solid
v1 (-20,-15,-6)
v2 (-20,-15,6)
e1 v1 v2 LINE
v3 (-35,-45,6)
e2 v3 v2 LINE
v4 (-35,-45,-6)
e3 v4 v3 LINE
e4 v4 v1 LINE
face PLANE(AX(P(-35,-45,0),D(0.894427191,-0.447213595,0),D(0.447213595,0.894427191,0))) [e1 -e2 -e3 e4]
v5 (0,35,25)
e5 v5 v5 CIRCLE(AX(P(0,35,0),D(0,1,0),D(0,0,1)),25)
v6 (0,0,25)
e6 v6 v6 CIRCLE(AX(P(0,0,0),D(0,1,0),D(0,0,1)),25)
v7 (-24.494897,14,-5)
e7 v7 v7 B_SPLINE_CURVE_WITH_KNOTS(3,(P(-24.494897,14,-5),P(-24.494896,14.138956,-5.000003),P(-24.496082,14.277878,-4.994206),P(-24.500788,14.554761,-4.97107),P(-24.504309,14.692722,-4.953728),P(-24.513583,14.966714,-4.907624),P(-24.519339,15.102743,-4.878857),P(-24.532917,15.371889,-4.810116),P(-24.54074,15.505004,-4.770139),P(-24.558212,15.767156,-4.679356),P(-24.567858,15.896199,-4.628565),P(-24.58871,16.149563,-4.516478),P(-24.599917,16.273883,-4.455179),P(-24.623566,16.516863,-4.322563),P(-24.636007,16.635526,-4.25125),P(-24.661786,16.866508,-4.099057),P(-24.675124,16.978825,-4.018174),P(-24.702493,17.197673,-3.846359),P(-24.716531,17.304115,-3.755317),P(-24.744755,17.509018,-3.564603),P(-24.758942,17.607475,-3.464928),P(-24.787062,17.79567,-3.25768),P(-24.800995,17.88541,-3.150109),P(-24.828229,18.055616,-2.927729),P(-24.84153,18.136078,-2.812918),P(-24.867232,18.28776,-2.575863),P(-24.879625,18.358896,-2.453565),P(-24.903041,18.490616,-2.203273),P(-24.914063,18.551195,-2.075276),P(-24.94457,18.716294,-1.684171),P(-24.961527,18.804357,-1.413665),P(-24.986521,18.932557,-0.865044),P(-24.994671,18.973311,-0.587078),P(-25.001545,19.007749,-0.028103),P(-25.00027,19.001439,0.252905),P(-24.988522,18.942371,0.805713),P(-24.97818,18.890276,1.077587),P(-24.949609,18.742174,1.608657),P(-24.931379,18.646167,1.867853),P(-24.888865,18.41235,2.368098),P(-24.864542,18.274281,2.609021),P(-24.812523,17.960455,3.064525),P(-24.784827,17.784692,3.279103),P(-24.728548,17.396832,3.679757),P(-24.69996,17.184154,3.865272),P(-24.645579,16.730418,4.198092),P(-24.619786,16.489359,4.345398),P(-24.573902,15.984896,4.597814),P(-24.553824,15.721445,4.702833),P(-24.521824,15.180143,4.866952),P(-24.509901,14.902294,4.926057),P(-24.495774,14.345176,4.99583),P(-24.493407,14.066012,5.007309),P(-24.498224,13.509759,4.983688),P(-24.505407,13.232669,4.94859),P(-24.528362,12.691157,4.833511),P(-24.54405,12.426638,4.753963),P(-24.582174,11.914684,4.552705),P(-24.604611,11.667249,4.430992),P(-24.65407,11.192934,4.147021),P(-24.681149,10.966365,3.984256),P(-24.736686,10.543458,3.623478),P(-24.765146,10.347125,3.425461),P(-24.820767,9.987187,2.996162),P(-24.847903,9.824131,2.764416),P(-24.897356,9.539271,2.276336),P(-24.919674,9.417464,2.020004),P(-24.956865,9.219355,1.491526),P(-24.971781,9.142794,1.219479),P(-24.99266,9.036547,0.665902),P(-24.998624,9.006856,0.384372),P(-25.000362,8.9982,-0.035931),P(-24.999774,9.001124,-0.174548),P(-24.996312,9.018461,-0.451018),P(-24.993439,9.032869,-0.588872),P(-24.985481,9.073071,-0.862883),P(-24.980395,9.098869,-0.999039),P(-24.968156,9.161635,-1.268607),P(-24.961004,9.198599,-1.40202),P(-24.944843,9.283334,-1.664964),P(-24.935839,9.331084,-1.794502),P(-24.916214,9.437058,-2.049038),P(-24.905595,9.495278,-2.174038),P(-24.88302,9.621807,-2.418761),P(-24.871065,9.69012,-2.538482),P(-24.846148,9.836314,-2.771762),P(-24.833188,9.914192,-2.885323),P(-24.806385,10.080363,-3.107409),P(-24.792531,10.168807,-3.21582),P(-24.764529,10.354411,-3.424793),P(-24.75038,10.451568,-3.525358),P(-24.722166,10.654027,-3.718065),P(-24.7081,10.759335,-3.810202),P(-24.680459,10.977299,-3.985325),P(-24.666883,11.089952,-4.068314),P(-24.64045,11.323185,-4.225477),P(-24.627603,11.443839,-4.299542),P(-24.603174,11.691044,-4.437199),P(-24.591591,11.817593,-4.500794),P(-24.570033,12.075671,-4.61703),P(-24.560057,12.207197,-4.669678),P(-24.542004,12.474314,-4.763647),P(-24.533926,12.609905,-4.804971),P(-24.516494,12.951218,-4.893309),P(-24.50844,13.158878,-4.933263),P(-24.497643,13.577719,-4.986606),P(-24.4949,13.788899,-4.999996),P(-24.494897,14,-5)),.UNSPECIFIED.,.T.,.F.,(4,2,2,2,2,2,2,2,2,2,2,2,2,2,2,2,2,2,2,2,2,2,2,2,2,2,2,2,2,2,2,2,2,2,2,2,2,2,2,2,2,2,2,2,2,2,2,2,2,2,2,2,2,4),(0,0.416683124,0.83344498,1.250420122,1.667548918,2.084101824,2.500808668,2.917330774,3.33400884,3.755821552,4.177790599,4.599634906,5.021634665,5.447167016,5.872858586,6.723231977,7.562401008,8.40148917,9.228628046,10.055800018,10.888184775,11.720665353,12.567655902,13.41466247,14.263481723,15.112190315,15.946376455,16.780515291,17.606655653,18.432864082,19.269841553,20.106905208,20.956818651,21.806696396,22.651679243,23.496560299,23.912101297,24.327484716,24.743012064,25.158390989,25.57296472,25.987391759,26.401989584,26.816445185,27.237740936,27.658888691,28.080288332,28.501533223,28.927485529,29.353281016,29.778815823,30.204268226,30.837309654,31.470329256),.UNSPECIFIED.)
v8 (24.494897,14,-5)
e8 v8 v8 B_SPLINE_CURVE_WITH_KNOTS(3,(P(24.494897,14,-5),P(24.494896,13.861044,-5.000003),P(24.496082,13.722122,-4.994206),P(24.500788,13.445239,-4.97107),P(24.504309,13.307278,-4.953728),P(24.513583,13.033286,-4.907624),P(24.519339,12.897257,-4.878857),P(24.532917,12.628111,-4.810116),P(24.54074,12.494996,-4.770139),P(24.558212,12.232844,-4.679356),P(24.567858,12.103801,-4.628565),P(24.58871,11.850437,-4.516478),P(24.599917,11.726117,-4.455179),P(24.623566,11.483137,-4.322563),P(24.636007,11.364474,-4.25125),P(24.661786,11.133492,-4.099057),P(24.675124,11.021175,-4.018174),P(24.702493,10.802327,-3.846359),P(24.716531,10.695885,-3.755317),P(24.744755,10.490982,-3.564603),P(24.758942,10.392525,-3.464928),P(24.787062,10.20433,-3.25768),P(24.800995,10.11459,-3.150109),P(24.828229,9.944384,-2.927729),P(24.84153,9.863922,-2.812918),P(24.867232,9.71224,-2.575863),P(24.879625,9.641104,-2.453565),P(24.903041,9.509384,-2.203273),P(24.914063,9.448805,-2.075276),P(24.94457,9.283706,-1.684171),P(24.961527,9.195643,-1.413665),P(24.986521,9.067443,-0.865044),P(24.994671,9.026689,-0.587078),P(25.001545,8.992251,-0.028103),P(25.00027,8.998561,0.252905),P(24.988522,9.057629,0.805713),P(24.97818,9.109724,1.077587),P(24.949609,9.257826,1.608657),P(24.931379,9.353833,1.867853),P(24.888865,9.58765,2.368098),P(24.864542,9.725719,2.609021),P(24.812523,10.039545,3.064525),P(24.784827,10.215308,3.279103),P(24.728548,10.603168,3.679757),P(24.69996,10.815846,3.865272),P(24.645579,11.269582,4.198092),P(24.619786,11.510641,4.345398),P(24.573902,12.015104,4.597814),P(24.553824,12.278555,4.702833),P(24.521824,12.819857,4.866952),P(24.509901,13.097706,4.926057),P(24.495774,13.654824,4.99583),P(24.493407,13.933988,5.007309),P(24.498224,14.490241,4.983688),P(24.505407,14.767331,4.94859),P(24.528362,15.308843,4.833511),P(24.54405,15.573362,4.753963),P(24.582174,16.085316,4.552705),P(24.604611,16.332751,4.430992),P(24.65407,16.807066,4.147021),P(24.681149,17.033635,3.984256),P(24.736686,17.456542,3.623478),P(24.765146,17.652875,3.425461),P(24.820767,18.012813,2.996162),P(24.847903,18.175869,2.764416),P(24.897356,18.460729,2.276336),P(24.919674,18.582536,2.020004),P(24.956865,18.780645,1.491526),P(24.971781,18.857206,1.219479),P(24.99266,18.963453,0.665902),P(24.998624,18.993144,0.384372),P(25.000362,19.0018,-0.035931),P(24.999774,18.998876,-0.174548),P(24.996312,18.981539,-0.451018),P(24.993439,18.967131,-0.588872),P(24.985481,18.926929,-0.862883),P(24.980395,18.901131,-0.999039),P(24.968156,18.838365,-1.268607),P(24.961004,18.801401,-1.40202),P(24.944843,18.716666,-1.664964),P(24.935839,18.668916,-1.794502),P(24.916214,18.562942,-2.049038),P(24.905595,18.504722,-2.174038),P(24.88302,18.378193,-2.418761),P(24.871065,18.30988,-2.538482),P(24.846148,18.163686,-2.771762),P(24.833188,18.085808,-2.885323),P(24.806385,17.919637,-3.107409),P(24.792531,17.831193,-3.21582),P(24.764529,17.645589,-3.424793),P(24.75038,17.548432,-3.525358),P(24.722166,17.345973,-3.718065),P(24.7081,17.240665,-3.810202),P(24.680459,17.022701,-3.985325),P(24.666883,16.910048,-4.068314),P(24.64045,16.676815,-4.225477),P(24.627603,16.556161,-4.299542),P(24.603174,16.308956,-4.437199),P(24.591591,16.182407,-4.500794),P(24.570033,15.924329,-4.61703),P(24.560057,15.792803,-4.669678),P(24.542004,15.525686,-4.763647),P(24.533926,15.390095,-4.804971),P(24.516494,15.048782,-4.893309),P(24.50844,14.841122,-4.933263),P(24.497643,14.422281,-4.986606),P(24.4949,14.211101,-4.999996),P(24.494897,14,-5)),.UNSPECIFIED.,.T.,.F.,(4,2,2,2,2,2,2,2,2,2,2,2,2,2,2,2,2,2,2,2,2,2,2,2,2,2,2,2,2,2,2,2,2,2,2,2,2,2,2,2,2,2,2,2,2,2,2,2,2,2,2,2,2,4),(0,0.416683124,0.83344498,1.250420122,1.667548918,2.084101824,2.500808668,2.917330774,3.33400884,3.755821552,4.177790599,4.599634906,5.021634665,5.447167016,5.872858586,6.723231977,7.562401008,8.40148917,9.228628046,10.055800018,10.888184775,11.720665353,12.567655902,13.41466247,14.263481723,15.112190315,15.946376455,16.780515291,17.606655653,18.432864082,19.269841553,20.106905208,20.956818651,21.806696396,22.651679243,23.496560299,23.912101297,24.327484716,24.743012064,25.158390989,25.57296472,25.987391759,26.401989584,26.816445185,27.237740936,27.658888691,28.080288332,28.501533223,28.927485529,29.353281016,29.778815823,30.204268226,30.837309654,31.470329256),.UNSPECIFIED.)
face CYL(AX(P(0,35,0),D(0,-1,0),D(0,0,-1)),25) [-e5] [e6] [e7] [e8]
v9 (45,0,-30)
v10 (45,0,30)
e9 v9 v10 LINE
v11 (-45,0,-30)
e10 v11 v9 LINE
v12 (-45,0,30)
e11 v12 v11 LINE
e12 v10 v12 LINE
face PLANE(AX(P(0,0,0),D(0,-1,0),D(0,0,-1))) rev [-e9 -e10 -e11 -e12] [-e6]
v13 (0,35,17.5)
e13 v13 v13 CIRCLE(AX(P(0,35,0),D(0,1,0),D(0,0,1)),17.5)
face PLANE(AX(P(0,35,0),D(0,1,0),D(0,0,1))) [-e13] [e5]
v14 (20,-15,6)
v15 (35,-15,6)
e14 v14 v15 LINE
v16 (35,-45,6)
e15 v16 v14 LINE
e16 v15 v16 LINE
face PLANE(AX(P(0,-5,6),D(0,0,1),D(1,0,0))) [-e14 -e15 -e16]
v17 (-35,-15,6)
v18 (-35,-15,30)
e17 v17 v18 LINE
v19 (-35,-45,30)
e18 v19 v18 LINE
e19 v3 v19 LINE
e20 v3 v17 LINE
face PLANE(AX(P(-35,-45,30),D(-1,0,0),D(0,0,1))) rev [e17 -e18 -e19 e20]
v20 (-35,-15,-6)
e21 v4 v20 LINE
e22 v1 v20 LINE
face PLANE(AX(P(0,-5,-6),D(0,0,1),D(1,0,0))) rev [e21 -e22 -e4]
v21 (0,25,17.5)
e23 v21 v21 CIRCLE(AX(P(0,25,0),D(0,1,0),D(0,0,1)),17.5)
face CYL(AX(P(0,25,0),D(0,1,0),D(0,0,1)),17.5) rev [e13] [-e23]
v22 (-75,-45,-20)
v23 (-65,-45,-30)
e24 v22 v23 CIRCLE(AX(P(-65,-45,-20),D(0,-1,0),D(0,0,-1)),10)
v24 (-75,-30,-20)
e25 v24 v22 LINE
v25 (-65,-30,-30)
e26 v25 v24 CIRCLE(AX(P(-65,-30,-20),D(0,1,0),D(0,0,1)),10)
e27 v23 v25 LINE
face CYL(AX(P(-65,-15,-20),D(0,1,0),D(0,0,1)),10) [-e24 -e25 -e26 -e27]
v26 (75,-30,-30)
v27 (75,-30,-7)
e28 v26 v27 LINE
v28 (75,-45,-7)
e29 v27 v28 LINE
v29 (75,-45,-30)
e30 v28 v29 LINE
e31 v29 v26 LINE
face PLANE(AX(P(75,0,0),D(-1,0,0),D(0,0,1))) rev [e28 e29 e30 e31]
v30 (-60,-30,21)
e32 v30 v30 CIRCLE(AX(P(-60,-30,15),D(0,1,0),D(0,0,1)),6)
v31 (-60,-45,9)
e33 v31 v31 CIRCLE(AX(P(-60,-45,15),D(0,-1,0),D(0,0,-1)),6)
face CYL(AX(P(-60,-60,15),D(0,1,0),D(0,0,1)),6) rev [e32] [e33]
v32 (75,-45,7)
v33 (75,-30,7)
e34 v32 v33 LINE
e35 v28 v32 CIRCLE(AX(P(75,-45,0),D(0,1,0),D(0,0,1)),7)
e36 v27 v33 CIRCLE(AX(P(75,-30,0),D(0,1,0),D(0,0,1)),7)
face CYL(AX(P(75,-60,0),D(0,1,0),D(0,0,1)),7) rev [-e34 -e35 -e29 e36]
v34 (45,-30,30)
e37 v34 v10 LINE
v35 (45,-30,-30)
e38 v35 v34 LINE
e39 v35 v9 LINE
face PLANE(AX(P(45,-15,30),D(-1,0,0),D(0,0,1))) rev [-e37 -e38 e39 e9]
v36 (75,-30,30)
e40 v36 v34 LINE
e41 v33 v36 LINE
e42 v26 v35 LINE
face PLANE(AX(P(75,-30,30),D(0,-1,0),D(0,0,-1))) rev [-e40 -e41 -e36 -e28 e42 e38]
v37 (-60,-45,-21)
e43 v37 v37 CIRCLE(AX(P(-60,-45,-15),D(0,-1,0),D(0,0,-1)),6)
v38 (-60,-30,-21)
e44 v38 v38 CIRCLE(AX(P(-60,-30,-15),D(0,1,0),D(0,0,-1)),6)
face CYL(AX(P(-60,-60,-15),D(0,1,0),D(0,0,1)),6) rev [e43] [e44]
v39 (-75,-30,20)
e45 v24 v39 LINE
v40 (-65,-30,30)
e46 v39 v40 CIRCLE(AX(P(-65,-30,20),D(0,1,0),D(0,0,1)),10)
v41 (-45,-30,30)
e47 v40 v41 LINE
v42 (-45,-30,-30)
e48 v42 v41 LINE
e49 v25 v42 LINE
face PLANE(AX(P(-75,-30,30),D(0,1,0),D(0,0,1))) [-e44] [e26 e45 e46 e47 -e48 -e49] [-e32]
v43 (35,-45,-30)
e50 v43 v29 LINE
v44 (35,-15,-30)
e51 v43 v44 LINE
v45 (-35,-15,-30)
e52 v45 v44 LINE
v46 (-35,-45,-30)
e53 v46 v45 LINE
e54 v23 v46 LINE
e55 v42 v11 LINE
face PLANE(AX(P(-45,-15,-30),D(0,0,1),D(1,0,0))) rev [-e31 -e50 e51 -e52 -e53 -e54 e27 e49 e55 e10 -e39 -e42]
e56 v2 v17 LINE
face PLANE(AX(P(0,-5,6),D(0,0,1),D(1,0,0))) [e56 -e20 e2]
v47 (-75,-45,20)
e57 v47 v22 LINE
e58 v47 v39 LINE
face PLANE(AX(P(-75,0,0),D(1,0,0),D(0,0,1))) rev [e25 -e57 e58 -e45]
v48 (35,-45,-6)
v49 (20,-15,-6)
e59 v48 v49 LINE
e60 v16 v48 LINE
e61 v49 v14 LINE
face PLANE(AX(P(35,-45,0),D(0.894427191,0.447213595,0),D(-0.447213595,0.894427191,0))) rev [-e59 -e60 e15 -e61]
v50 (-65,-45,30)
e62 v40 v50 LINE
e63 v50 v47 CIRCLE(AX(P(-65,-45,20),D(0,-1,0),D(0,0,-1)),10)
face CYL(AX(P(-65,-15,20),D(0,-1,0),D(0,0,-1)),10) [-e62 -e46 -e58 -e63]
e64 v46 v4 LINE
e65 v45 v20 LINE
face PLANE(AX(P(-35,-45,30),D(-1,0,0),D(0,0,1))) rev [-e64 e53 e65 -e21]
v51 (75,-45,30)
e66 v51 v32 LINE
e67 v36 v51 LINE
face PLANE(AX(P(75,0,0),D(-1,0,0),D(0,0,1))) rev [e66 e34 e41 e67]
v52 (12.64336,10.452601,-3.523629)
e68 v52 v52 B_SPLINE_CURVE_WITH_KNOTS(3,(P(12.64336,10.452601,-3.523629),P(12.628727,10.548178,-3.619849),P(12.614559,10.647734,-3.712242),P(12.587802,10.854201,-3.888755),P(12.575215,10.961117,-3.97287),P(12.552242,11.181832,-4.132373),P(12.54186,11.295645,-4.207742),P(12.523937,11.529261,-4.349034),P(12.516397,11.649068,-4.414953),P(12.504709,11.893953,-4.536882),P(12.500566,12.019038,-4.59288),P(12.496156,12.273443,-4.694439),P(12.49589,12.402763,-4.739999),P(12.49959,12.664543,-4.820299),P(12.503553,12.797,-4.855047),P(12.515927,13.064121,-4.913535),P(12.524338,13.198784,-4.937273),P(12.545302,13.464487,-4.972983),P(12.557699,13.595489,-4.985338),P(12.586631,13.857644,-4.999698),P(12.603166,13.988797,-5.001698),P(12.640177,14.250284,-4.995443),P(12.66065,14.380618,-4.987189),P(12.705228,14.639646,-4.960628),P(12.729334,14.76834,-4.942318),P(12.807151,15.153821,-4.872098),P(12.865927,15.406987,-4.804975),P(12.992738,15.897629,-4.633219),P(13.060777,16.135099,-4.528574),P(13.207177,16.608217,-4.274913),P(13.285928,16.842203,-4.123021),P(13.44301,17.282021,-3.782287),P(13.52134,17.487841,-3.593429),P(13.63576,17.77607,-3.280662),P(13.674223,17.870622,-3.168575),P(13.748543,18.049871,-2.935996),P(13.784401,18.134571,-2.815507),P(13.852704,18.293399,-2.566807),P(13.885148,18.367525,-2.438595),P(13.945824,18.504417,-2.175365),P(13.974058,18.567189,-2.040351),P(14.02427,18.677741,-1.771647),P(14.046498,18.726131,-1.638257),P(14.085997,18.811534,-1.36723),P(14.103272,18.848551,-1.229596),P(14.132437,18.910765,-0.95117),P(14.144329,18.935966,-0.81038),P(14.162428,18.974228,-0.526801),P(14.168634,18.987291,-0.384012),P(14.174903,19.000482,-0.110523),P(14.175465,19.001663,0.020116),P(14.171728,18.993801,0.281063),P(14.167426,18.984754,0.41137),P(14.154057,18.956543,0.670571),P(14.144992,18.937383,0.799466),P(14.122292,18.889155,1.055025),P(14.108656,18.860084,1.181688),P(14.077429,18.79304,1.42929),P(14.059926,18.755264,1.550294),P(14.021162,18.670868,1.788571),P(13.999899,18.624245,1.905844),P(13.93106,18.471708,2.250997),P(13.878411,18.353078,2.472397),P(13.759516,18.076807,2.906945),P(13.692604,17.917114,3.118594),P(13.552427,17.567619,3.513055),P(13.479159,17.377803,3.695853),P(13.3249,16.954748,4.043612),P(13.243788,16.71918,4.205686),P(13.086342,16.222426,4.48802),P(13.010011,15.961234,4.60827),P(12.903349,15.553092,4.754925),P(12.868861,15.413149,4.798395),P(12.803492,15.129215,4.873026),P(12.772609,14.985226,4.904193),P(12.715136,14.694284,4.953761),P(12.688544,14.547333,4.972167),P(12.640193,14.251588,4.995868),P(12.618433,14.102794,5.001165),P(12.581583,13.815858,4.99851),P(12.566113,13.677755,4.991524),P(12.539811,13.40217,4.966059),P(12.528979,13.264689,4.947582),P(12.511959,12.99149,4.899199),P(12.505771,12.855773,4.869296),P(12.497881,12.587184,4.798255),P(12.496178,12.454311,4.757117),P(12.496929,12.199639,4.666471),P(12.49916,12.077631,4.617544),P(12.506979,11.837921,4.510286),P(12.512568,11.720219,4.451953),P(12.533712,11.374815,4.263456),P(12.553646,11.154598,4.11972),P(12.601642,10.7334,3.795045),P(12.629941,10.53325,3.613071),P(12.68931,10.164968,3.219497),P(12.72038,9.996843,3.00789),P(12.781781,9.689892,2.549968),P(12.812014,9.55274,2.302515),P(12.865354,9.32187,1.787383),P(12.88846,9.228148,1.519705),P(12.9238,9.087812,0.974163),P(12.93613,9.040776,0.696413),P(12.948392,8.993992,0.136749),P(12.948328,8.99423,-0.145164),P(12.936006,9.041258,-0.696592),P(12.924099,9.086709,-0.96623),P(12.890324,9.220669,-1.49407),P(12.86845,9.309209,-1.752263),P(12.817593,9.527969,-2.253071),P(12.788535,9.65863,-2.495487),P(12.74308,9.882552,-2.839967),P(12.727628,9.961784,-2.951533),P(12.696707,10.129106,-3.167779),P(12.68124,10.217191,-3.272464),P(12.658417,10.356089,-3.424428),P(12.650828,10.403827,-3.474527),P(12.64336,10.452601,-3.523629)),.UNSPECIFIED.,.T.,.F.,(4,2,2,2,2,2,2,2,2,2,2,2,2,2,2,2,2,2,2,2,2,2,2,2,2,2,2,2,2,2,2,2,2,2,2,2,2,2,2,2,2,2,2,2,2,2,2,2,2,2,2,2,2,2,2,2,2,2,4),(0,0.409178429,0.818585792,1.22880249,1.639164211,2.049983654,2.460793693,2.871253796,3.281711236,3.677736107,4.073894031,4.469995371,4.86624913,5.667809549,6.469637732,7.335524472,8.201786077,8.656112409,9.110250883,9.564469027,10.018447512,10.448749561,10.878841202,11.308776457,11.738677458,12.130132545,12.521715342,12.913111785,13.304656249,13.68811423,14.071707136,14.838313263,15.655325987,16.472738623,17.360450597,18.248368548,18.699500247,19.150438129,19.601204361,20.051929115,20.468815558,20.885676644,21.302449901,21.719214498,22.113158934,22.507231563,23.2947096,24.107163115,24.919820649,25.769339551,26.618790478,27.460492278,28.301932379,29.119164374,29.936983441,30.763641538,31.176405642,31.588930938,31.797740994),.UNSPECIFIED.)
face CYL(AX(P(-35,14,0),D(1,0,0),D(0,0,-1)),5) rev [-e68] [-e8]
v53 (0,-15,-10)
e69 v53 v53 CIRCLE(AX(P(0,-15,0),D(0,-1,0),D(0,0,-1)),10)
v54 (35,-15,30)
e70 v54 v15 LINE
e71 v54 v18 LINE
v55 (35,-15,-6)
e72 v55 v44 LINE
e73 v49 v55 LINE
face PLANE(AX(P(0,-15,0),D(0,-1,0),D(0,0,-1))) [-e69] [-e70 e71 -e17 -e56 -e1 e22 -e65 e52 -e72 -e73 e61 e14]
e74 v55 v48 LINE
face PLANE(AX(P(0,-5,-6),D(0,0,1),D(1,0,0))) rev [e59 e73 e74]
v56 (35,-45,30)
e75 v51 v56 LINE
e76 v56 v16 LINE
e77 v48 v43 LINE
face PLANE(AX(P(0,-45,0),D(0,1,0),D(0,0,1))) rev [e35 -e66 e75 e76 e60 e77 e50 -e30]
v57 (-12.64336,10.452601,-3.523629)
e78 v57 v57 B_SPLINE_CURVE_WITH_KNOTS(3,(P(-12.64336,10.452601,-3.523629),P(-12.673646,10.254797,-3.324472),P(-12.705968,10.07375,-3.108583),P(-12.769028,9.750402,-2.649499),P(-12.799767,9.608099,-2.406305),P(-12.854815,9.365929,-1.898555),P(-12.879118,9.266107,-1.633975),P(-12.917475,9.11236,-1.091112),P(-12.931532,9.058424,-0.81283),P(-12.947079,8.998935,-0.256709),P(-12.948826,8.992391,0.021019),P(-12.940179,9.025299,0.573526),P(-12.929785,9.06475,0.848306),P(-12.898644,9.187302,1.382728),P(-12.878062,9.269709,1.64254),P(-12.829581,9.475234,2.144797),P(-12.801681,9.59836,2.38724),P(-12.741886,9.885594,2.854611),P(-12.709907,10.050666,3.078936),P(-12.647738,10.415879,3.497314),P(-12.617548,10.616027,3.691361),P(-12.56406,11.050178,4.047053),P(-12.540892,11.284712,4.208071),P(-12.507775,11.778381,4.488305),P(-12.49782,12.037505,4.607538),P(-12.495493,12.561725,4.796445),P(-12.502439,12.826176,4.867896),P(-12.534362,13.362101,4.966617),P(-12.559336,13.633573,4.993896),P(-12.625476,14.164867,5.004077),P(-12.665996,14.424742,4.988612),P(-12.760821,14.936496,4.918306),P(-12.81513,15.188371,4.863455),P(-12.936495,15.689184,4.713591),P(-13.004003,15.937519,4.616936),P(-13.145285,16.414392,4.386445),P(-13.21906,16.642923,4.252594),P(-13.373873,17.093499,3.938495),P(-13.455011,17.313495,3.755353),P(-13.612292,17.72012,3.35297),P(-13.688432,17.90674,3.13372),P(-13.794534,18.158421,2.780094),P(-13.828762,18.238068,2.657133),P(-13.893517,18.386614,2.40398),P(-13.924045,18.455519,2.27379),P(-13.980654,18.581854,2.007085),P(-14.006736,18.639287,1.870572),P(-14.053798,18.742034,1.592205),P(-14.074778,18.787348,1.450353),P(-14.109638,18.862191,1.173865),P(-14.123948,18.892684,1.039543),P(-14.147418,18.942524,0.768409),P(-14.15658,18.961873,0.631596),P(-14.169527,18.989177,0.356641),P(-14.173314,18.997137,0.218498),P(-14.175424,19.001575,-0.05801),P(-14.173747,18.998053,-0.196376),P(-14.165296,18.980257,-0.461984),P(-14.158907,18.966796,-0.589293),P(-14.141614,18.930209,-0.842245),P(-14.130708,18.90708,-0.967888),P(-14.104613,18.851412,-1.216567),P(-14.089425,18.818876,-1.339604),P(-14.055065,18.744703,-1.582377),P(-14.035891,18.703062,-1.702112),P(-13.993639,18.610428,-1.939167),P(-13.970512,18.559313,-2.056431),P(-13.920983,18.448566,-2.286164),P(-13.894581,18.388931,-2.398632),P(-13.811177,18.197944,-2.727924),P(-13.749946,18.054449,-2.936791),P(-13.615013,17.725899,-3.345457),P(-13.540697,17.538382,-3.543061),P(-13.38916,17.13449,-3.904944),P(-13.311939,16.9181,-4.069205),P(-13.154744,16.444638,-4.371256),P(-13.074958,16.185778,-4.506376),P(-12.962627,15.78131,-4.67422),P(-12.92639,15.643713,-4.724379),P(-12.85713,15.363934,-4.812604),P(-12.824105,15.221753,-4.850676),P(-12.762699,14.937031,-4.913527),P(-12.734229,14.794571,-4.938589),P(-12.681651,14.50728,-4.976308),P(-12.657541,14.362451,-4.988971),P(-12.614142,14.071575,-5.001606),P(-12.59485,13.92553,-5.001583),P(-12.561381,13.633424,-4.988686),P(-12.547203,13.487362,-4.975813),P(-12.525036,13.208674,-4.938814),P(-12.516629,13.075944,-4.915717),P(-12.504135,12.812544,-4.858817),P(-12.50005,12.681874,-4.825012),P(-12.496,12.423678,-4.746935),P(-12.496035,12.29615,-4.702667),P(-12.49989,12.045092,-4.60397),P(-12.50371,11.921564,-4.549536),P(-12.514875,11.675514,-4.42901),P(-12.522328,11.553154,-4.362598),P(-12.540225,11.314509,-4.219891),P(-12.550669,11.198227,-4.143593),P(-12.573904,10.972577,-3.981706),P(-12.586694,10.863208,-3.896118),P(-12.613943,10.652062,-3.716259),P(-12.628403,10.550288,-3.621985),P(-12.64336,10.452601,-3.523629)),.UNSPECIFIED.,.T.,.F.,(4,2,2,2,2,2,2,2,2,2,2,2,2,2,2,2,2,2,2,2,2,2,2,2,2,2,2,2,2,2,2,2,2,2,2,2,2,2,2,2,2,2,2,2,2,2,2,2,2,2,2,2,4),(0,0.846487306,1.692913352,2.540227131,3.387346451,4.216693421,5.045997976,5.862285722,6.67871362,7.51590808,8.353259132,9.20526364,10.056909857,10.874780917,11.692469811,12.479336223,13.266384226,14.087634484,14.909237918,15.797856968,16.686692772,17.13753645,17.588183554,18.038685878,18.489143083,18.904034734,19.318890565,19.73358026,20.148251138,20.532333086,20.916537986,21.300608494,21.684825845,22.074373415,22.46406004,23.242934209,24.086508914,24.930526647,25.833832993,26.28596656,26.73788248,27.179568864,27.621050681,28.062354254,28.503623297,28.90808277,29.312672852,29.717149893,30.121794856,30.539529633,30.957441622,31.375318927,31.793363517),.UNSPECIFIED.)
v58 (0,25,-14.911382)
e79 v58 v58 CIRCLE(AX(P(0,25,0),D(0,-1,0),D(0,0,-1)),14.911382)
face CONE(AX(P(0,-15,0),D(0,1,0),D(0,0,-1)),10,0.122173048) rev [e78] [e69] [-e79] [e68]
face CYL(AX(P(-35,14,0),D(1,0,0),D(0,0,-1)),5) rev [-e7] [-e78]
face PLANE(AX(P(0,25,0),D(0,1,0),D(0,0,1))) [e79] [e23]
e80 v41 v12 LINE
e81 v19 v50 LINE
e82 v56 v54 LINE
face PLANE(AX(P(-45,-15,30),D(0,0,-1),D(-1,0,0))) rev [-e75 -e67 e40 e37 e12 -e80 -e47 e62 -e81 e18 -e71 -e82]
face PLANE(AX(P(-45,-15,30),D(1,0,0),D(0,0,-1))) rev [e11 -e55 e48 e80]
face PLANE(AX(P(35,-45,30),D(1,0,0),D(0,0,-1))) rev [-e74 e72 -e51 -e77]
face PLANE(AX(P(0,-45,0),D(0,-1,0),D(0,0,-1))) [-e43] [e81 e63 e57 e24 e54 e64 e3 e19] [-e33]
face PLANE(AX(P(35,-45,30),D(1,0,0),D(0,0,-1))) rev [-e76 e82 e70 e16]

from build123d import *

# Parameters (mm, degrees)
SKETCH1_R           = 25
BOSS_EXTRUDE1_DEPTH = 35
SKETCH2_R           = 17.5
CUT_EXTRUDE1_DEPTH  = 10
SKETCH7_W           = 90
SKETCH7_H           = 60
BOSS_EXTRUDE3_DEPTH = 15
SKETCH8_R           = 10
CUT_EXTRUDE4_DEPTH  = 40
CUT_EXTRUDE4_DRAFT  = 7
SKETCH9_W           = 10
SKETCH9_H           = 60
BOSS_EXTRUDE4_DEPTH = 30
SKETCH11_R          = 5
CUT_EXTRUDE5_DEPTH  = 35
SKETCH12_W          = 60
SKETCH12_H          = 15
BOSS_EXTRUDE5_DEPTH = 30
RIB1_START          = -6
RIB1_DEPTH          = 12
SKETCH16_R          = 6
CUT_EXTRUDE6_DEPTH  = 30
FILLET1_R           = 10
SKETCH17_R          = 7
CUT_EXTRUDE7_DEPTH  = 30


# Read off the part's stored shape, not the designer's step: Rib1
with BuildPart() as part:
    # Sketch1 → Boss-Extrude1 (new body)
    with BuildSketch(Plane(origin=(0, 0, 0), x_dir=(1, 0, 0), z_dir=(0, 1, 0))):
        with Locations(Location((0, 0, 0), (0, 0, 270))):
            Circle(SKETCH1_R)
    extrude(amount=BOSS_EXTRUDE1_DEPTH)

    # Sketch2 → Cut-Extrude1 (cut)
    with BuildSketch(Plane(origin=(0, 35, 0), x_dir=(1, 0, 0), z_dir=(0, 1, 0))):
        with Locations(Location((0, 0, 0), (0, 0, 270))):
            Circle(SKETCH2_R)
    extrude(amount=-CUT_EXTRUDE1_DEPTH, mode=Mode.SUBTRACT)

    # Sketch7 → Boss-Extrude3 (add)
    with BuildSketch(Plane.XZ):
        Rectangle(SKETCH7_W, SKETCH7_H)
    extrude(amount=BOSS_EXTRUDE3_DEPTH)


with BuildPart() as cut_extrude4_tool:
    # Sketch8 → Cut-Extrude4 (with draft: the straight prism first)
    with BuildSketch(Plane.XZ.offset(15)):
        Circle(SKETCH8_R)
    extrude(amount=-CUT_EXTRUDE4_DEPTH)
    # Cut-Extrude4: the draft: its side faces are tilted about the plane it starts from
    cut_extrude4_sides = [cut_extrude4_tool.faces().sort_by_distance(p)[0] for p in [
        (-10, 5, 0),
    ]]
    draft(cut_extrude4_sides, Plane.XZ.offset(15), CUT_EXTRUDE4_DRAFT)


with BuildPart() as part_1:
    add(part.part)

    # Cut-Extrude4: cut by cut_extrude4_tool
    add(cut_extrude4_tool.part, mode=Mode.SUBTRACT)

    # Sketch9 → Boss-Extrude4 (add)
    with BuildSketch(Plane.XZ.offset(15)):
        with Locations((-40, 0)):
            Rectangle(SKETCH9_W, SKETCH9_H)
        with Locations((40, 0)):
            Rectangle(SKETCH9_W, SKETCH9_H)
    extrude(amount=BOSS_EXTRUDE4_DEPTH)

    # Sketch11 → Cut-Extrude5 (cut, symmetric)
    with BuildSketch(Plane(origin=(0, 0, 0), x_dir=(0, 0, -1), z_dir=(1, 0, 0))):
        with Locations((0, 14)):
            Circle(SKETCH11_R)
    extrude(amount=CUT_EXTRUDE5_DEPTH, both=True, mode=Mode.SUBTRACT)

    # Sketch12 → Boss-Extrude5 (add)
    with BuildSketch(Plane(origin=(45, 0, 0), x_dir=(0, 0, -1), z_dir=(1, 0, 0))):
        with Locations((0, -37.5)):
            Rectangle(SKETCH12_W, SKETCH12_H)
    boss_extrude5 = extrude(amount=BOSS_EXTRUDE5_DEPTH)

    # Mirror1: Boss-Extrude5 across plane
    add(boss_extrude5.mirror(Plane(origin=(0, 0, 0), x_dir=(0, 0, 1), z_dir=(1, 0, 0))))

    # Rib1 outline → Rib1 (add)
    with BuildSketch(Plane.XY.offset(RIB1_START)):
        Polygon((-35, -15), (-35, -45), (-20, -15), align=None)
    rib1 = extrude(amount=RIB1_DEPTH)

    # Mirror2: Rib1 across plane
    add(rib1.mirror(Plane(origin=(0, 0, 0), x_dir=(0, 0, 1), z_dir=(1, 0, 0))))

    # Sketch16 → Cut-Extrude6 (cut)
    with BuildSketch(Plane(origin=(0, -30, 0), x_dir=(1, 0, 0), z_dir=(0, 1, 0))):
        with Locations(Location((-60, -15, 0), (0, 0, 270))):
            Circle(SKETCH16_R)
        with Locations(Location((-60, 15, 0), (0, 0, 90))):
            Circle(SKETCH16_R)
    extrude(amount=-CUT_EXTRUDE6_DEPTH, mode=Mode.SUBTRACT)

    # Fillet1
    fillet1_edges = [part_1.edges().sort_by_distance(p)[0] for p in [
        (-75, -37.5, 30),
        (-75, -37.5, -30),
    ]]
    fillet(fillet1_edges, radius=FILLET1_R)

    # Sketch17 → Cut-Extrude7 (cut)
    with BuildSketch(Plane(origin=(0, -30, 0), x_dir=(1, 0, 0), z_dir=(0, 1, 0))):
        with Locations((75, 0)):
            Circle(SKETCH17_R)
    extrude(amount=-CUT_EXTRUDE7_DEPTH, mode=Mode.SUBTRACT)


solid = part_1.part
